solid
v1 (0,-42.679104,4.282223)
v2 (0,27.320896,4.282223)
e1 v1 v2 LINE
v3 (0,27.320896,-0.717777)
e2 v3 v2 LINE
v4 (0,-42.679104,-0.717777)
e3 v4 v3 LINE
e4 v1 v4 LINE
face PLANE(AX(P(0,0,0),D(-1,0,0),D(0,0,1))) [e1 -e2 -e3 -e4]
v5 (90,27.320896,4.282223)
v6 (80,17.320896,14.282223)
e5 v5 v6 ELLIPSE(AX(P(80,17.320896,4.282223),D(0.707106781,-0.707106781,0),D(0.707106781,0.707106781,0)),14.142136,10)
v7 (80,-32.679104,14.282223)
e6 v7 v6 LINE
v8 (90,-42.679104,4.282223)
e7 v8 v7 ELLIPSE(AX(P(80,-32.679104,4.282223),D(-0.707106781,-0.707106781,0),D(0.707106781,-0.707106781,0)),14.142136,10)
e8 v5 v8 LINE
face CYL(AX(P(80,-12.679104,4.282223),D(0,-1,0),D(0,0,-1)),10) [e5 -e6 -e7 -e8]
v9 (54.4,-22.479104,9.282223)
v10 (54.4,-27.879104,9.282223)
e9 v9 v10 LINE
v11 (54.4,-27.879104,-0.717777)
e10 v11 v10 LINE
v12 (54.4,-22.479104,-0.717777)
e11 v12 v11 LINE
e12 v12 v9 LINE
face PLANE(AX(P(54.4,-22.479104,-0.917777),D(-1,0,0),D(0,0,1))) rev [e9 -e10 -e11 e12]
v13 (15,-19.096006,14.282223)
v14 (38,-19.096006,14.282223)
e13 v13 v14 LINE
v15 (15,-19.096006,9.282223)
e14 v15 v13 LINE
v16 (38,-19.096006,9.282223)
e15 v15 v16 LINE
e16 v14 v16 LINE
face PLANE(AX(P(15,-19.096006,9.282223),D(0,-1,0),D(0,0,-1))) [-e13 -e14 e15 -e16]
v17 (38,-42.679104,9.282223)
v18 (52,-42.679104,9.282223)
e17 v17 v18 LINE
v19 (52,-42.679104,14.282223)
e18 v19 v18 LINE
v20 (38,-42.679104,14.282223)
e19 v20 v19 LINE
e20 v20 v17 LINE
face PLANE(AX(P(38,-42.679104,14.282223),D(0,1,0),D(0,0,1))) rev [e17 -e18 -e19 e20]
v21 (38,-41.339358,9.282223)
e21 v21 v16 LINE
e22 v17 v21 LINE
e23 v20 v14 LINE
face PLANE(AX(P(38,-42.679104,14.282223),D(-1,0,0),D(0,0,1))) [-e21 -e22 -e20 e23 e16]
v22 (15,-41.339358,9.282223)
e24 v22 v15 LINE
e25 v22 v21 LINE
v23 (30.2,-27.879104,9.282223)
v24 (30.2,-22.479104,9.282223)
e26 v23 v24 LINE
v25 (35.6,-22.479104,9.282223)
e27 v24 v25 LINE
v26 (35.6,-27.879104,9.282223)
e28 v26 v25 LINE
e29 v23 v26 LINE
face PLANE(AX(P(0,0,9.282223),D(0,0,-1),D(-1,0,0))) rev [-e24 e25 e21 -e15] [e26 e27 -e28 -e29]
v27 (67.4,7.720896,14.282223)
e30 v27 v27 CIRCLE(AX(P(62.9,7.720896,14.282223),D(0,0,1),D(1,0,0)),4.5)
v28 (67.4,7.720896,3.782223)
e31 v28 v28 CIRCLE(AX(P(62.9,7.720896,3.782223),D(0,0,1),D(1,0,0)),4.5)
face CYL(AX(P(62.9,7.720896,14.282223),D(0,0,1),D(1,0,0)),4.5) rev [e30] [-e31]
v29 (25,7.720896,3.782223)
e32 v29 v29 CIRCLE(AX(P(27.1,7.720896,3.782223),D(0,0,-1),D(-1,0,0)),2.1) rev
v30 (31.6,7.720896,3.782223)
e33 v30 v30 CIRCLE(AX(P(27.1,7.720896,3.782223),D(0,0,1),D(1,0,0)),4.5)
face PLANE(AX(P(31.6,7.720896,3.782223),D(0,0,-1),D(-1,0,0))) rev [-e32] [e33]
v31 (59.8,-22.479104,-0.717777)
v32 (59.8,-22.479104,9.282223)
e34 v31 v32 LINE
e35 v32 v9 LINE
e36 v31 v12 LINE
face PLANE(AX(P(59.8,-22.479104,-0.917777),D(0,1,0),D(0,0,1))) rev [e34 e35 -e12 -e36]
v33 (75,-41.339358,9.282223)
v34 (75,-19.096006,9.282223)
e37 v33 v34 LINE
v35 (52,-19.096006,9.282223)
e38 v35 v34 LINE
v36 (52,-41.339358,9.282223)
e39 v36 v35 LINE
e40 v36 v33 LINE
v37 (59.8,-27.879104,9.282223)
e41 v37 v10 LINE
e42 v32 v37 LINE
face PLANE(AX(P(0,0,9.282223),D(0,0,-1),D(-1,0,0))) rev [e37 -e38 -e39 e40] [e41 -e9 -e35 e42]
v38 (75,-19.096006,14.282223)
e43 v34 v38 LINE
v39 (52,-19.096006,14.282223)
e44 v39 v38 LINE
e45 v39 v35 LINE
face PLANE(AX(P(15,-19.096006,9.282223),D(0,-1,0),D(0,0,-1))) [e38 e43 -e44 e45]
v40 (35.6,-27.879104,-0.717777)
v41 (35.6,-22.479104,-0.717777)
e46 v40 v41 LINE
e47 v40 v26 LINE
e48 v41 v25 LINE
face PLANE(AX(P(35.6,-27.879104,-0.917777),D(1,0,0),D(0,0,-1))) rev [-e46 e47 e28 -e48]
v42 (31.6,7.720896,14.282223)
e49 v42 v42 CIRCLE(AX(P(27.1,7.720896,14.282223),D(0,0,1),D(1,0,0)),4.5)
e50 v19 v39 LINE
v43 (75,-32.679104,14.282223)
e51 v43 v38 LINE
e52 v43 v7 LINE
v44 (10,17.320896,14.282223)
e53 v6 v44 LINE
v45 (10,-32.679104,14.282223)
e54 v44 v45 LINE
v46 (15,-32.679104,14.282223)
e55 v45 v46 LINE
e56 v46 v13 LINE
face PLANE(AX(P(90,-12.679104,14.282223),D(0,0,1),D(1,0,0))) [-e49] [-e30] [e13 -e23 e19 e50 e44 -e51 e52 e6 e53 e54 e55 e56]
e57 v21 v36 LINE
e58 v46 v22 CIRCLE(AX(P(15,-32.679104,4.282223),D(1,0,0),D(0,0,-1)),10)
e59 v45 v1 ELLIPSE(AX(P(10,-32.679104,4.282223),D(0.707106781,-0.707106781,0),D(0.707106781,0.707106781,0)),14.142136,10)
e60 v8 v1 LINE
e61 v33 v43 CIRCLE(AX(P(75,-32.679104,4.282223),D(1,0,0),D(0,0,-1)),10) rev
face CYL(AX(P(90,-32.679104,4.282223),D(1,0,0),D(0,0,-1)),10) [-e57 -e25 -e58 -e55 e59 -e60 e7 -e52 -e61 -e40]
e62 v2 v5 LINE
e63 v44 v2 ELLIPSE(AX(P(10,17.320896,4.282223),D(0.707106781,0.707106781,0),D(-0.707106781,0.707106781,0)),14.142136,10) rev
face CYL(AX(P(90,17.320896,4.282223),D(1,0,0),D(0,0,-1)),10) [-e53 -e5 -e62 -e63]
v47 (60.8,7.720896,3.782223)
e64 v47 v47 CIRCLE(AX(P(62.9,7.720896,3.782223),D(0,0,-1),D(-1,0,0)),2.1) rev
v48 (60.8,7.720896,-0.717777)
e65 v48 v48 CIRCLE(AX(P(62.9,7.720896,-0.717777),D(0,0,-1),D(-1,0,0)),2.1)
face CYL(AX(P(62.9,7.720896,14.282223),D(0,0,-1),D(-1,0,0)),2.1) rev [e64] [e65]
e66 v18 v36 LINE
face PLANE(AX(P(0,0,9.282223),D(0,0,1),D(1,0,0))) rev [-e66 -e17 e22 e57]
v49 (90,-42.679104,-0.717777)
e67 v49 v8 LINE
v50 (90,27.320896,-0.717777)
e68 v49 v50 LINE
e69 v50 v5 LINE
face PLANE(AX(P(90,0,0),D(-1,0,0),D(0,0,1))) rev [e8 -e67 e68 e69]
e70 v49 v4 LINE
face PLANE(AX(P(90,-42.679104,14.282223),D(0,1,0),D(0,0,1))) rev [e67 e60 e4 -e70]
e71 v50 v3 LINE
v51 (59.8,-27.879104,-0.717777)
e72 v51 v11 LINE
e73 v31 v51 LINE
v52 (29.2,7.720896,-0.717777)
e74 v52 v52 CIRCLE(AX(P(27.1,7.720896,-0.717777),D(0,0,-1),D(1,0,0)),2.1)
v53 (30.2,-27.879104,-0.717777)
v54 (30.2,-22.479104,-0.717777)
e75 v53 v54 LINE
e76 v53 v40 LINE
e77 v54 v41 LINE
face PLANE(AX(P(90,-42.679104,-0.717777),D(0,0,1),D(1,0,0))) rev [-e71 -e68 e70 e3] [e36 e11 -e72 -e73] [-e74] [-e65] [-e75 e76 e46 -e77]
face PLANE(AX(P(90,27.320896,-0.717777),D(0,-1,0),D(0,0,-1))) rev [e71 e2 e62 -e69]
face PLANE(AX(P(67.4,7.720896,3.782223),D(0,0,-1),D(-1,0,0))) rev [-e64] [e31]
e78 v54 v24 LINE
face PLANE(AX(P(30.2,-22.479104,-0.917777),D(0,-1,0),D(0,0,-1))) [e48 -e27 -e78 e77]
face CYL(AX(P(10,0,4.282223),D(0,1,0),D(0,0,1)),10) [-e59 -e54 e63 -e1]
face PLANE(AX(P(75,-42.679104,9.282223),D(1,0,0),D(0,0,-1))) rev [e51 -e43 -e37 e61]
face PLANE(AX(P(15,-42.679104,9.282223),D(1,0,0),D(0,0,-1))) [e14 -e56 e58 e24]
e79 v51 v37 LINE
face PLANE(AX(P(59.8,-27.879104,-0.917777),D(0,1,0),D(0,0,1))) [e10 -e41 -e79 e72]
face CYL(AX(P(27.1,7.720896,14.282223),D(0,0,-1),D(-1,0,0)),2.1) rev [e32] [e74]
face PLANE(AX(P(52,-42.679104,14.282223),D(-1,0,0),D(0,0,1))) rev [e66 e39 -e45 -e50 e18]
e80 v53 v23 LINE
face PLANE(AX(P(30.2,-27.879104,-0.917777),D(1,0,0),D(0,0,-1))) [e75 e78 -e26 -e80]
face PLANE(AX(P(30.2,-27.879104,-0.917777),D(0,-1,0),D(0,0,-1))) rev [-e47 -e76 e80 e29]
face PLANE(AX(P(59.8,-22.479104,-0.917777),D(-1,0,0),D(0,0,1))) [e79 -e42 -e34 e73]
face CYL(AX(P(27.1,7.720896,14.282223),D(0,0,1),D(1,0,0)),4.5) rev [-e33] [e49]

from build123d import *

# Parameters (mm, degrees)
BOSS_EXTRUDE3_DEPTH       = 90
SKETCH3_R                 = 2.1
CUT_EXTRUDE1_DEPTH        = 101.729866263
SKETCH7_W                 = 60
SKETCH7_H                 = 23.583098141
CUT_EXTRUDE3_DEPTH        = 5
SKETCH8_W                 = 5.4
SKETCH8_H                 = 5.4
CUT_EXTRUDE4_DEPTH        = 10.2
FILLET3_R                 = 10
SKETCH9_W                 = 14
SKETCH9_H                 = 23.583098141
BOSS_EXTRUDE4_DEPTH       = 5
ADVANCEDHOLE2_START       = 3.782223439
ADVANCEDHOLE2_OUTLINE_R   = 4.5
ADVANCEDHOLE2_OUTLINE_R_2 = 2.1
ADVANCEDHOLE2_DEPTH       = 10.5


# Read off the part's stored shape, not the designer's step: AdvancedHole2
with BuildPart() as part:
    # Sketch1 → Boss-Extrude3 (new body)
    with BuildSketch(Plane.YZ):
        Polygon((-42.679104458, 14.282223439), (-12.679104458, 14.282223439), (27.320895542, 14.282223439), (27.320895542, -0.717776561), (-42.679104458, -0.717776561), (-42.679104458, 2.342667118), align=None)
    extrude(amount=BOSS_EXTRUDE3_DEPTH)

    # Sketch3 → Cut-Extrude1 (cut, through all)
    with BuildSketch(Plane(origin=(0, 0, -0.717776561), x_dir=(1, 0, 0), z_dir=(0, 0, -1))):
        with Locations(Location((57.1, 25.179104458, 0), (0, 0, 180))):
            Circle(SKETCH3_R)
        with Locations((32.9, 25.179104458)):
            Circle(SKETCH3_R)
        with Locations(Location((62.9, -7.720895542, 0), (0, 0, 180))):
            Circle(SKETCH3_R)
        with Locations((27.1, -7.720895542)):
            Circle(SKETCH3_R)
    extrude(amount=-CUT_EXTRUDE1_DEPTH, mode=Mode.SUBTRACT)

    # Sketch7 → Cut-Extrude3 (cut)
    with BuildSketch(Plane.XY.offset(14.282223439)):
        with Locations((45, -30.887555388)):
            Rectangle(SKETCH7_W, SKETCH7_H)
    extrude(amount=-CUT_EXTRUDE3_DEPTH, mode=Mode.SUBTRACT)

    # Sketch8 → Cut-Extrude4 (cut)
    with BuildSketch(Plane.XY.offset(9.282223439)):
        with Locations((32.9, -25.179104458)):
            Rectangle(SKETCH8_W, SKETCH8_H)
        with Locations((57.1, -25.179104458)):
            Rectangle(SKETCH8_W, SKETCH8_H)
    extrude(amount=-CUT_EXTRUDE4_DEPTH, mode=Mode.SUBTRACT)

    # Fillet3
    # the kernel refuses this fillet: 10 mm, written as the material it takes off along each edge
    with BuildSketch(Plane(origin=(-60, 27.320895542, 14.282223439), x_dir=(0, -1, 0), z_dir=(1, 0, 0))) as fillet3_piece_1:
        with BuildLine():
            CenterArc((FILLET3_R, FILLET3_R), FILLET3_R, 180, 90)
            Line((0, FILLET3_R), (-FILLET3_R * 0.02, FILLET3_R))
            Line((-FILLET3_R * 0.02, FILLET3_R), (-FILLET3_R * 0.02, -FILLET3_R * 0.02))
            Line((-FILLET3_R * 0.02, -FILLET3_R * 0.02), (FILLET3_R, -FILLET3_R * 0.02))
            Line((FILLET3_R, -FILLET3_R * 0.02), (FILLET3_R, 0))
        make_face()
    extrude(amount=210, mode=Mode.SUBTRACT)
    with BuildSketch(Plane(origin=(15, -42.679104458, 14.282223439), x_dir=(0, 1, 0), z_dir=(1, 0, 0)), Plane(origin=(-60, -42.679104458, 14.282223439), x_dir=(0, 1, 0), z_dir=(1, 0, 0))) as fillet3_piece_2:
        with BuildLine():
            CenterArc((FILLET3_R, -FILLET3_R), FILLET3_R, 90, 90)
            Line((0, -FILLET3_R), (-FILLET3_R * 0.0200000000001, -FILLET3_R))
            Line((-FILLET3_R * 0.0200000000001, -FILLET3_R), (-FILLET3_R * 0.02, FILLET3_R * 0.02))
            Line((-FILLET3_R * 0.02, FILLET3_R * 0.02), (FILLET3_R, FILLET3_R * 0.02))
            Line((FILLET3_R, FILLET3_R * 0.02), (FILLET3_R, 0))
        make_face()
    extrude(amount=135, mode=Mode.SUBTRACT)
    with BuildSketch(Plane(origin=(90, -102.679104458, 14.282223439), x_dir=(-1, 0, 0), z_dir=(0, 1, 0)), Plane(origin=(0, 87.320895542, 14.282223439), x_dir=(1, 0, 0), z_dir=(0, -1, 0))) as fillet3_piece_3:
        with BuildLine():
            CenterArc((FILLET3_R, -FILLET3_R), FILLET3_R, 90, 90)
            Line((0, -FILLET3_R), (-FILLET3_R * 0.02, -FILLET3_R))
            Line((-FILLET3_R * 0.02, -FILLET3_R), (-FILLET3_R * 0.02, FILLET3_R * 0.02))
            Line((-FILLET3_R * 0.02, FILLET3_R * 0.02), (FILLET3_R, FILLET3_R * 0.02))
            Line((FILLET3_R, FILLET3_R * 0.02), (FILLET3_R, 0))
        make_face()
    extrude(amount=190, mode=Mode.SUBTRACT)

    # Sketch9 → Boss-Extrude4 (add)
    with BuildSketch(Plane.XY.offset(9.282223439)):
        with Locations((45, -30.887555388)):
            Rectangle(SKETCH9_W, SKETCH9_H)
    extrude(amount=BOSS_EXTRUDE4_DEPTH)

    # AdvancedHole2 outline → AdvancedHole2 (cut)
    # profile 1 of 2: a face of its own
    with BuildSketch(Plane.XY.offset(ADVANCEDHOLE2_START)):
        with Locations((62.9, 7.720895542)):
            Circle(ADVANCEDHOLE2_OUTLINE_R)
        with Locations((62.9, 7.720895542)):
            Circle(ADVANCEDHOLE2_OUTLINE_R_2, mode=Mode.SUBTRACT)
    # profile 2 of 2: a face of its own
    with BuildSketch(Plane.XY.offset(ADVANCEDHOLE2_START)):
        with Locations((27.1, 7.720895542)):
            Circle(ADVANCEDHOLE2_OUTLINE_R)
        with Locations((27.1, 7.720895542)):
            Circle(ADVANCEDHOLE2_OUTLINE_R_2, mode=Mode.SUBTRACT)
    extrude(amount=ADVANCEDHOLE2_DEPTH, mode=Mode.SUBTRACT)


solid = part.part
